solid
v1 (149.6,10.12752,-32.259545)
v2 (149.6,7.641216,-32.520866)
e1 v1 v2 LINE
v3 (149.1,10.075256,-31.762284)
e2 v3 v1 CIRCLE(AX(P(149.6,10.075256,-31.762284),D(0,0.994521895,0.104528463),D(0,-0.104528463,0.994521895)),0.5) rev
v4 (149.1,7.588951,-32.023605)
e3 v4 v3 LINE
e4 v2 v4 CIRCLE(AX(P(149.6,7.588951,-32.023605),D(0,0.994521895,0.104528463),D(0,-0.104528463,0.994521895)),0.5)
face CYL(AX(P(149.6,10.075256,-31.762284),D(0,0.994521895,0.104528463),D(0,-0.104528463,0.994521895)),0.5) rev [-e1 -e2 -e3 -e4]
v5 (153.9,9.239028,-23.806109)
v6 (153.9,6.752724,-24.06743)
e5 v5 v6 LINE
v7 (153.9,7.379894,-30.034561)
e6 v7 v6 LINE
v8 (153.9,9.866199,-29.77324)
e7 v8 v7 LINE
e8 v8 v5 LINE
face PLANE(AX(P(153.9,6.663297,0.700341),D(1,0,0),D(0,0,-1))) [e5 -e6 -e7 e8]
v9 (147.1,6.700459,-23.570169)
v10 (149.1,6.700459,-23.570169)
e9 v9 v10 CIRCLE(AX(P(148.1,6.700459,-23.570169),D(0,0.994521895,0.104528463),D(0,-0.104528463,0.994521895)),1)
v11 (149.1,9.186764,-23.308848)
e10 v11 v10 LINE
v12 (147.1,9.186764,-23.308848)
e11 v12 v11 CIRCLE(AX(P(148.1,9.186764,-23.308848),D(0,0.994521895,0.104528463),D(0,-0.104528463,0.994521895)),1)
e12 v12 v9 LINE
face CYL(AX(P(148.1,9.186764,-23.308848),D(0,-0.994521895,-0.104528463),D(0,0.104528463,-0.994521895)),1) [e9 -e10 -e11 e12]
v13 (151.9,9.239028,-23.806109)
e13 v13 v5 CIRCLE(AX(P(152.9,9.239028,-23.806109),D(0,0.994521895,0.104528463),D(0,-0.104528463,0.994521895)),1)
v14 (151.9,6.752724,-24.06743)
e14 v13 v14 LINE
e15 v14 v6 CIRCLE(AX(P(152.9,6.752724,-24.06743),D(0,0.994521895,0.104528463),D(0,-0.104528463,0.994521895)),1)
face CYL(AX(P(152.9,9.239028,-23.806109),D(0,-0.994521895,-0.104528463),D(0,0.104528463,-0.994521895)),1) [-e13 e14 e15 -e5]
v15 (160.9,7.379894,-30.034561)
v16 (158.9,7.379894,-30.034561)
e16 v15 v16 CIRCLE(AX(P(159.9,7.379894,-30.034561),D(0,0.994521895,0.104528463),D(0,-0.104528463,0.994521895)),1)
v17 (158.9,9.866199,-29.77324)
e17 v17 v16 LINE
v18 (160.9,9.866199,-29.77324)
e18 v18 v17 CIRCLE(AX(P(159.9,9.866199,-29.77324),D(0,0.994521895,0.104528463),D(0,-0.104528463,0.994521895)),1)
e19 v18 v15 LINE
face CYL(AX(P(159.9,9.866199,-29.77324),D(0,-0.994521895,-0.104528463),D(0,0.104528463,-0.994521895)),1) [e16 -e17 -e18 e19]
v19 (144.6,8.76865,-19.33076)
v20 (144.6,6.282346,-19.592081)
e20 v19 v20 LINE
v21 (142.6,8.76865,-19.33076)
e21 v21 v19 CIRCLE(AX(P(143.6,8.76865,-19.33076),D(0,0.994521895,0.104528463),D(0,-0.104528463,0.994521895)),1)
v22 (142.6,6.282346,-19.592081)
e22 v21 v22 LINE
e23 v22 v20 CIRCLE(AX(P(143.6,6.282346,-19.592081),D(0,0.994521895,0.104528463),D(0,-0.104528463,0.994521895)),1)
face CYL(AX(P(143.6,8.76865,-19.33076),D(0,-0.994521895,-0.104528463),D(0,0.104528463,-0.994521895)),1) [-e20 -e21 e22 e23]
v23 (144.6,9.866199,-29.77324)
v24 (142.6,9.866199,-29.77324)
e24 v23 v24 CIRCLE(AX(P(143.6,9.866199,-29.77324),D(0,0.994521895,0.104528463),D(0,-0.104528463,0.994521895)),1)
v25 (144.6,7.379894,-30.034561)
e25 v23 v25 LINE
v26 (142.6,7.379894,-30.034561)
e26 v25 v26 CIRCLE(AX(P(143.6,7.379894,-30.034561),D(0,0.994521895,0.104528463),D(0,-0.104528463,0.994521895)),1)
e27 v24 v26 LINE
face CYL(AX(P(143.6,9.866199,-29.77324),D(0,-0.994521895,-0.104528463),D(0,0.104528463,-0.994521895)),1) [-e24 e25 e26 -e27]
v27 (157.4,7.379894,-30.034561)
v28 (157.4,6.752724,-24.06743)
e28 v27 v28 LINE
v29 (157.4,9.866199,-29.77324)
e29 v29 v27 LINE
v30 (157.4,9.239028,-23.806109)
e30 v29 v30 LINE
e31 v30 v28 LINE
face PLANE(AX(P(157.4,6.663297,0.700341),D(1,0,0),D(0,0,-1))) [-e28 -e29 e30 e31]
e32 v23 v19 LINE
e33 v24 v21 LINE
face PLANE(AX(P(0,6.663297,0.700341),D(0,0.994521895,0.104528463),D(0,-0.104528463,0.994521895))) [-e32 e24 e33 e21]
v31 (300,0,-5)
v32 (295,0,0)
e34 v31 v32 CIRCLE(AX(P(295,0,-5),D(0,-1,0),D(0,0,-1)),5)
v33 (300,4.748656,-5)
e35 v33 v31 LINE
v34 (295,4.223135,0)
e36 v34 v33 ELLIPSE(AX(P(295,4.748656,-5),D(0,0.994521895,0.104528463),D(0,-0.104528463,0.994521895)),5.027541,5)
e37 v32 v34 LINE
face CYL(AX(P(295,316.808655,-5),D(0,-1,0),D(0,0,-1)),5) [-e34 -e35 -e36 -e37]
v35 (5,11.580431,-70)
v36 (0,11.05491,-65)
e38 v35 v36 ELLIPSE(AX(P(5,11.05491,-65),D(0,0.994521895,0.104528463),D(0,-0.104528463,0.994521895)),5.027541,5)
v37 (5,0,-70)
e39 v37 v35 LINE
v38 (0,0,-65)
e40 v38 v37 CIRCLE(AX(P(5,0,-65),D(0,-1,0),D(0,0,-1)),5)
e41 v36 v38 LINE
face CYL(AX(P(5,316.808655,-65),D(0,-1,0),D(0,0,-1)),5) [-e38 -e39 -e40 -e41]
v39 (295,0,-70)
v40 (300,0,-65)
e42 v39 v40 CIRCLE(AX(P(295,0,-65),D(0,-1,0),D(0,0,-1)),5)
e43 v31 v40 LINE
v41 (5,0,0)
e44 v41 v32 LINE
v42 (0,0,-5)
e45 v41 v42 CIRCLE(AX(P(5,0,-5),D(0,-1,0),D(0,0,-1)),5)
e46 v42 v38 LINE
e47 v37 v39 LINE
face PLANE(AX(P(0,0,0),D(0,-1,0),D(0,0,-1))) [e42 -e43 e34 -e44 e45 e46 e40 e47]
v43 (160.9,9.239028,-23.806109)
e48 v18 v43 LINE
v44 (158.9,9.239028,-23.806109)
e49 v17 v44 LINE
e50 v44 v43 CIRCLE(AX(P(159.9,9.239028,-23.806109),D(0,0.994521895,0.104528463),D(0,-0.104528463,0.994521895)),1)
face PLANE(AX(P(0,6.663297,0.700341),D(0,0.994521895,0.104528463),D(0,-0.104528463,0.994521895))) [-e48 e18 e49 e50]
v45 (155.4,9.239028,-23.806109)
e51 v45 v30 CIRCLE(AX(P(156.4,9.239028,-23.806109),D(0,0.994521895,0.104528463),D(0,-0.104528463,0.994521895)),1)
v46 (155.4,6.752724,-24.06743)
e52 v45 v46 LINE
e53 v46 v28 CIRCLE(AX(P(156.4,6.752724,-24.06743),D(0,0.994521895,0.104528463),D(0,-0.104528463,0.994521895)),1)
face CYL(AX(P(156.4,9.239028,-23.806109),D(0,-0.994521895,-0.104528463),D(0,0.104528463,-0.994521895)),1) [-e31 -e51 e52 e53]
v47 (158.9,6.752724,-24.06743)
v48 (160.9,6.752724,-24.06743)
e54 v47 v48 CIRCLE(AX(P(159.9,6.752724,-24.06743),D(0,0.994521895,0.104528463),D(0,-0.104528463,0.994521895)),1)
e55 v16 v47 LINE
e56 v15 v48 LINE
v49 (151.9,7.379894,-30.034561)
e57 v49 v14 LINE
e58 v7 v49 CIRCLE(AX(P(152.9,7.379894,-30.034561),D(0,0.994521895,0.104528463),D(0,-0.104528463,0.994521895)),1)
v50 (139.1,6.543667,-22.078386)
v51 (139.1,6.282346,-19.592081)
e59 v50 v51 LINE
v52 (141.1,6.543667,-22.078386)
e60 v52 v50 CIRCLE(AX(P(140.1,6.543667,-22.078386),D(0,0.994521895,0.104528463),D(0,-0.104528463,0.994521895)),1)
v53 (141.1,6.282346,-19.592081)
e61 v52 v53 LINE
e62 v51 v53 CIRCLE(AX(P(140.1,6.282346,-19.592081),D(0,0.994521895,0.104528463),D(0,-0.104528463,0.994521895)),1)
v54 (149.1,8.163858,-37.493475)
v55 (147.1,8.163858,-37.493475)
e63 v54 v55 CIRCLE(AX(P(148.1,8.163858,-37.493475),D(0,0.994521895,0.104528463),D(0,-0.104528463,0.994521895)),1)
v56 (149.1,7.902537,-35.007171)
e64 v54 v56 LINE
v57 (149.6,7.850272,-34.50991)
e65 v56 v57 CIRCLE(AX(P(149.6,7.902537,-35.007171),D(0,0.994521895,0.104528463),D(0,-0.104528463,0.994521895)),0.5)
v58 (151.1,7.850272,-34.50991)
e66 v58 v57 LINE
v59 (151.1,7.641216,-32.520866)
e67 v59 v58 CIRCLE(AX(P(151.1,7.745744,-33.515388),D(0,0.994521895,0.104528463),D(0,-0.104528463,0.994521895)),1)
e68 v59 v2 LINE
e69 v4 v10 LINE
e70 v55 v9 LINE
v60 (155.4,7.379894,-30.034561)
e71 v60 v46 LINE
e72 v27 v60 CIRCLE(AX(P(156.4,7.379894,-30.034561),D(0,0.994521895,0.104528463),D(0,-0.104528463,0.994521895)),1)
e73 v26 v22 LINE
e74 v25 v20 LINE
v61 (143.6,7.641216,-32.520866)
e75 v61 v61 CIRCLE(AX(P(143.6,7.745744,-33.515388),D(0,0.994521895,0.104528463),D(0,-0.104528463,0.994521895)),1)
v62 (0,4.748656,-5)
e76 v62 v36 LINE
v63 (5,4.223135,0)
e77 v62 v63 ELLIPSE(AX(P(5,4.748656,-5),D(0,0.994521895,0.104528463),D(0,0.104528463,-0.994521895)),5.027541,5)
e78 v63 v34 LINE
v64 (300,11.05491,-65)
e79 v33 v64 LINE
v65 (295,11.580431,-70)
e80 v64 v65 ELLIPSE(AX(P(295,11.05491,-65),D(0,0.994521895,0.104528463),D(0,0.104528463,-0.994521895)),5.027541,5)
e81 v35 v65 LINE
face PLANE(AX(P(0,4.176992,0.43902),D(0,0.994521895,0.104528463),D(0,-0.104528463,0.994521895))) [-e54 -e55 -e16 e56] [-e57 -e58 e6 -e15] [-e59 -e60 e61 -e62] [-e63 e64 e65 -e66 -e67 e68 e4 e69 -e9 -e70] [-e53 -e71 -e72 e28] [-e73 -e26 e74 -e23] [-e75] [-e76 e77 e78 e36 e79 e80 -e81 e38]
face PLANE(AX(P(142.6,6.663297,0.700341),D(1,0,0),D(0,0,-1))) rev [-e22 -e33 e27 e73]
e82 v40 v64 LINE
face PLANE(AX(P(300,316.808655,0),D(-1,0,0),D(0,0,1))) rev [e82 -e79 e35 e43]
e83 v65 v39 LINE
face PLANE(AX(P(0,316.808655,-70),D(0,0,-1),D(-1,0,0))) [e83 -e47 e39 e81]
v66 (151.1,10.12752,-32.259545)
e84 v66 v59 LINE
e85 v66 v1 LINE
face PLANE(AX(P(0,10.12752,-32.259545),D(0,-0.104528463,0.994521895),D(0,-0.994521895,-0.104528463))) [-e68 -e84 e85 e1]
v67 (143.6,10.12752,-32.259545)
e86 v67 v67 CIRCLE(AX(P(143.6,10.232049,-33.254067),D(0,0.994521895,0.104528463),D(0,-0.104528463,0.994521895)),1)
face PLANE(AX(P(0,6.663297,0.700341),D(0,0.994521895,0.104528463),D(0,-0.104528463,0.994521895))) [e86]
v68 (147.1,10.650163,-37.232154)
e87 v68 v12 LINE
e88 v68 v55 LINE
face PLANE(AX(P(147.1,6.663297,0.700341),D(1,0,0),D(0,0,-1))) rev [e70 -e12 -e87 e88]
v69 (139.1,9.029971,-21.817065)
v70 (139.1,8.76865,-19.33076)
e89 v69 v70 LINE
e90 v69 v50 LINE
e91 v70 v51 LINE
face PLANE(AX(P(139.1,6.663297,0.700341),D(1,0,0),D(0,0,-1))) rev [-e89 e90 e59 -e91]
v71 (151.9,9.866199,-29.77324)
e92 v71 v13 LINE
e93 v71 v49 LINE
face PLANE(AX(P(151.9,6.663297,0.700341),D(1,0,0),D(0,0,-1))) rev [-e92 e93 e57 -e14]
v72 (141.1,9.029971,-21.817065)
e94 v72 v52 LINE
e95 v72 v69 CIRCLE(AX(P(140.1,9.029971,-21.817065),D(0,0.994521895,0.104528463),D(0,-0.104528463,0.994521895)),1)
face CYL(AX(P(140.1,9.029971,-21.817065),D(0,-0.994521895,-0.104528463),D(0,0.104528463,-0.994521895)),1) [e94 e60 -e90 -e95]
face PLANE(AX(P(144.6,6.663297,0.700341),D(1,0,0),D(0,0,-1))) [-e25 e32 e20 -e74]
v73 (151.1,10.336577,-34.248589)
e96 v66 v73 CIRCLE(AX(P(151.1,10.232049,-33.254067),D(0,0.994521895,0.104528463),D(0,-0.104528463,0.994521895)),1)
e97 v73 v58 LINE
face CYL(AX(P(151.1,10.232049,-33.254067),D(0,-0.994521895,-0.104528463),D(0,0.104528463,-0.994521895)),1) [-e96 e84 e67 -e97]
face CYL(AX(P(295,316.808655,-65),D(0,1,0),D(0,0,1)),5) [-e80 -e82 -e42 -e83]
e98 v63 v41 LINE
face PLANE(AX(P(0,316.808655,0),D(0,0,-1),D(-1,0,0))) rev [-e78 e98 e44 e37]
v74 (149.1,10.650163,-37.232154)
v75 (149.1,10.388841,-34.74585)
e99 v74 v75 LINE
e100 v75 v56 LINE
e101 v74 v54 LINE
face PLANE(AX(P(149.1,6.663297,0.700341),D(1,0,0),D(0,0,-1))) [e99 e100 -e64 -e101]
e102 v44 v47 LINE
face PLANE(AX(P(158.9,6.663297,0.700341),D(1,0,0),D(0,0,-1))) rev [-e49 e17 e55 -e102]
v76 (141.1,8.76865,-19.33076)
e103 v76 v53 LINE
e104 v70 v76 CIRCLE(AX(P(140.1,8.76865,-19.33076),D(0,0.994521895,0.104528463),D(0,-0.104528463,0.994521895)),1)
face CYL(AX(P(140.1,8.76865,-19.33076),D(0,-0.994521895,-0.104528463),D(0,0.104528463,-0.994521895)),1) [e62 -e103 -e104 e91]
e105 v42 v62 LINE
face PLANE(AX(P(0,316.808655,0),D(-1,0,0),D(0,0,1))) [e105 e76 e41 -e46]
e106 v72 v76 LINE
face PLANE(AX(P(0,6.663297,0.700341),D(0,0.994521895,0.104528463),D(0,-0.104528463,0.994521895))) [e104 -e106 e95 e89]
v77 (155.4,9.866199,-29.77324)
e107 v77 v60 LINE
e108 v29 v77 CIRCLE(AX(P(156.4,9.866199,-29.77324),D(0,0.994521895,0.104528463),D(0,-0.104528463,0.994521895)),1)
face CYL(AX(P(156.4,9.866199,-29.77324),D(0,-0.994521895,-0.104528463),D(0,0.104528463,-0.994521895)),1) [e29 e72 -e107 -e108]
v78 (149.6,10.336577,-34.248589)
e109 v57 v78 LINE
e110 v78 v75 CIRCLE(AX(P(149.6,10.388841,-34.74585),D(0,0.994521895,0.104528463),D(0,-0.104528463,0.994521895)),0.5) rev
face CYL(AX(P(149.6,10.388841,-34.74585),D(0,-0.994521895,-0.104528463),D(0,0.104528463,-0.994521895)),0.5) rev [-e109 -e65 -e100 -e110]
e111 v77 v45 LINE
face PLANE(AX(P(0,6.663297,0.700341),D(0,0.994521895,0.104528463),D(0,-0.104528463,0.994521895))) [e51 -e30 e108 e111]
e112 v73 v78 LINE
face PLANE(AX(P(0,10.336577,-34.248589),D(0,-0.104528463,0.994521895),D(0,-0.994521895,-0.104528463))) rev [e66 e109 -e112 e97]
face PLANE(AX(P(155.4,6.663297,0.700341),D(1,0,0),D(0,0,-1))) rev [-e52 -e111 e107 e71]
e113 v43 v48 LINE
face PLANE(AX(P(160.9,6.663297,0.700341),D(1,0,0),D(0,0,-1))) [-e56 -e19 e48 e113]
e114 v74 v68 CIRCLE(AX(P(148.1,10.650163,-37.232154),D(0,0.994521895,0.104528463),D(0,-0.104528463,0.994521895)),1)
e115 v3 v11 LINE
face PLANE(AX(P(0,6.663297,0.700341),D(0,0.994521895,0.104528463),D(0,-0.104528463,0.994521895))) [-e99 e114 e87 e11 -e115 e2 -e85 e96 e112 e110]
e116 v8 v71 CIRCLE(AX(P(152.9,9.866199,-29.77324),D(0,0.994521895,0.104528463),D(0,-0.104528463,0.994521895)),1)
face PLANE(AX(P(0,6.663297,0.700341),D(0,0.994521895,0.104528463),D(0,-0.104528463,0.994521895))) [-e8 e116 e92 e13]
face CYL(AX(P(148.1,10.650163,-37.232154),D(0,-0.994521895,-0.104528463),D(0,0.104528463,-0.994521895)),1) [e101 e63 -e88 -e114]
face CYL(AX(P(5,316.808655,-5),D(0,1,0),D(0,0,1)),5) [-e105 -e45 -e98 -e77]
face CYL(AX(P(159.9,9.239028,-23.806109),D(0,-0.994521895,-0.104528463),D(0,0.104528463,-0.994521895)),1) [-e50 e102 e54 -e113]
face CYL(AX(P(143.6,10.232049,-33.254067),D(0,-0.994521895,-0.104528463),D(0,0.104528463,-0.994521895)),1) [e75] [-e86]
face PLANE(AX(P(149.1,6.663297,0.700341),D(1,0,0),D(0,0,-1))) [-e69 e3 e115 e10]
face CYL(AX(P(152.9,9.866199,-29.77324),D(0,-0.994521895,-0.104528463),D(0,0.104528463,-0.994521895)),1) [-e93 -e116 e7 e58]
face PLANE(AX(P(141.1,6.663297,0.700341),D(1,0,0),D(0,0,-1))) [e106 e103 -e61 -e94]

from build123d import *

# Parameters (mm, degrees)
BOSS_EXTRUDE1_REACH = 318.657
SKETCH1_W           = 300
SKETCH1_H           = 70
SKETCH2_R           = 1
BOSS_EXTRUDE2_DEPTH = 2.5
FILLET1_R           = 5
FILLET2_R           = 0.5


with BuildPart() as part:
    # Boss-Extrude1: up to this plane
    boss_extrude1_end = Plane(origin=(0, 4.176991961, 0.439019546), z_dir=(0, 0.9945218953682733, 0.10452846326765369))
    # Sketch1 → Boss-Extrude1 (new, up to the surface)
    with BuildSketch(Plane(origin=(0, 0, 0), x_dir=(1, 0, 0), z_dir=(0, 1, 0)), mode=Mode.PRIVATE) as boss_extrude1_sk1:
        with Locations((150, 35)):
            Rectangle(SKETCH1_W, SKETCH1_H)
    boss_extrude1_tool1 = split(extrude(boss_extrude1_sk1.sketch, amount=BOSS_EXTRUDE1_REACH, mode=Mode.PRIVATE), bisect_by=boss_extrude1_end, keep=Keep.BOTH, mode=Mode.PRIVATE)
    add(boss_extrude1_tool1.solids().sort_by_distance((150, 0, -35))[0])

    # Sketch2 → Boss-Extrude2 (add)
    with BuildSketch(Plane(origin=(0, 4.176991961, 0.439019546), x_dir=(-1, 0, 0), z_dir=(0, 0.9945218953682733, 0.10452846326765368))):
        with BuildLine():
            ThreePointArc((-149.1, -38.141437788), (-148.1, -39.141437788), (-147.1, -38.141437788))
            Line((-147.1, -38.141437788), (-147.1, -24.141437788))
            ThreePointArc((-147.1, -24.141437788), (-148.1, -23.141437788), (-149.1, -24.141437788))
            Line((-149.1, -24.141437788), (-149.1, -33.141437788))
            Line((-149.1, -33.141437788), (-151.1, -33.141437788))
            ThreePointArc((-151.1, -33.141437788), (-152.1, -34.141437788), (-151.1, -35.141437788))
            Line((-151.1, -35.141437788), (-149.1, -35.141437788))
            Line((-149.1, -35.141437788), (-149.1, -38.141437788))
        make_face()
        with BuildLine():
            ThreePointArc((-144.6, -30.641437788), (-143.6, -31.641437788), (-142.6, -30.641437788))
            Line((-142.6, -30.641437788), (-142.6, -20.141437788))
            ThreePointArc((-142.6, -20.141437788), (-143.6, -19.141437788), (-144.6, -20.141437788))
            Line((-144.6, -20.141437788), (-144.6, -30.641437788))
        make_face()
        with BuildLine():
            ThreePointArc((-153.9, -30.641437788), (-152.9, -31.641437788), (-151.9, -30.641437788))
            Line((-151.9, -30.641437788), (-151.9, -24.641437788))
            ThreePointArc((-151.9, -24.641437788), (-152.9, -23.641437788), (-153.9, -24.641437788))
            Line((-153.9, -24.641437788), (-153.9, -30.641437788))
        make_face()
        with BuildLine():
            ThreePointArc((-157.4, -30.641437788), (-156.4, -31.641437788), (-155.4, -30.641437788))
            Line((-155.4, -30.641437788), (-155.4, -24.641437788))
            ThreePointArc((-155.4, -24.641437788), (-156.4, -23.641437788), (-157.4, -24.641437788))
            Line((-157.4, -24.641437788), (-157.4, -30.641437788))
        make_face()
        with BuildLine():
            ThreePointArc((-160.9, -30.641437788), (-159.9, -31.641437788), (-158.9, -30.641437788))
            Line((-158.9, -30.641437788), (-158.9, -24.641437788))
            ThreePointArc((-158.9, -24.641437788), (-159.9, -23.641437788), (-160.9, -24.641437788))
            Line((-160.9, -24.641437788), (-160.9, -30.641437788))
        make_face()
        with BuildLine():
            ThreePointArc((-141.1, -22.641437788), (-140.1, -23.641437788), (-139.1, -22.641437788))
            Line((-139.1, -22.641437788), (-139.1, -20.141437788))
            ThreePointArc((-139.1, -20.141437788), (-140.1, -19.141437788), (-141.1, -20.141437788))
            Line((-141.1, -20.141437788), (-141.1, -22.641437788))
        make_face()
        with Locations((-143.6, -34.141437788)):
            Circle(SKETCH2_R)
    extrude(amount=BOSS_EXTRUDE2_DEPTH)

    # Fillet1
    fillet1_edges = [part.edges().sort_by_distance(p)[0] for p in [
        (300, 5.790215621, -70),
        (300, 2.111567387, 0),
        (0, 2.111567387, 0),
        (0, 5.790215621, -70),
    ]]
    fillet(fillet1_edges, radius=FILLET1_R)

    # Fillet2
    fillet2_edges = [part.edges().sort_by_distance(p)[0] for p in [
        (149.1, 9.093424819, -34.37924919),
        (149.1, 8.884367892, -32.390205399),
    ]]
    fillet(fillet2_edges, radius=FILLET2_R)


solid = part.part
